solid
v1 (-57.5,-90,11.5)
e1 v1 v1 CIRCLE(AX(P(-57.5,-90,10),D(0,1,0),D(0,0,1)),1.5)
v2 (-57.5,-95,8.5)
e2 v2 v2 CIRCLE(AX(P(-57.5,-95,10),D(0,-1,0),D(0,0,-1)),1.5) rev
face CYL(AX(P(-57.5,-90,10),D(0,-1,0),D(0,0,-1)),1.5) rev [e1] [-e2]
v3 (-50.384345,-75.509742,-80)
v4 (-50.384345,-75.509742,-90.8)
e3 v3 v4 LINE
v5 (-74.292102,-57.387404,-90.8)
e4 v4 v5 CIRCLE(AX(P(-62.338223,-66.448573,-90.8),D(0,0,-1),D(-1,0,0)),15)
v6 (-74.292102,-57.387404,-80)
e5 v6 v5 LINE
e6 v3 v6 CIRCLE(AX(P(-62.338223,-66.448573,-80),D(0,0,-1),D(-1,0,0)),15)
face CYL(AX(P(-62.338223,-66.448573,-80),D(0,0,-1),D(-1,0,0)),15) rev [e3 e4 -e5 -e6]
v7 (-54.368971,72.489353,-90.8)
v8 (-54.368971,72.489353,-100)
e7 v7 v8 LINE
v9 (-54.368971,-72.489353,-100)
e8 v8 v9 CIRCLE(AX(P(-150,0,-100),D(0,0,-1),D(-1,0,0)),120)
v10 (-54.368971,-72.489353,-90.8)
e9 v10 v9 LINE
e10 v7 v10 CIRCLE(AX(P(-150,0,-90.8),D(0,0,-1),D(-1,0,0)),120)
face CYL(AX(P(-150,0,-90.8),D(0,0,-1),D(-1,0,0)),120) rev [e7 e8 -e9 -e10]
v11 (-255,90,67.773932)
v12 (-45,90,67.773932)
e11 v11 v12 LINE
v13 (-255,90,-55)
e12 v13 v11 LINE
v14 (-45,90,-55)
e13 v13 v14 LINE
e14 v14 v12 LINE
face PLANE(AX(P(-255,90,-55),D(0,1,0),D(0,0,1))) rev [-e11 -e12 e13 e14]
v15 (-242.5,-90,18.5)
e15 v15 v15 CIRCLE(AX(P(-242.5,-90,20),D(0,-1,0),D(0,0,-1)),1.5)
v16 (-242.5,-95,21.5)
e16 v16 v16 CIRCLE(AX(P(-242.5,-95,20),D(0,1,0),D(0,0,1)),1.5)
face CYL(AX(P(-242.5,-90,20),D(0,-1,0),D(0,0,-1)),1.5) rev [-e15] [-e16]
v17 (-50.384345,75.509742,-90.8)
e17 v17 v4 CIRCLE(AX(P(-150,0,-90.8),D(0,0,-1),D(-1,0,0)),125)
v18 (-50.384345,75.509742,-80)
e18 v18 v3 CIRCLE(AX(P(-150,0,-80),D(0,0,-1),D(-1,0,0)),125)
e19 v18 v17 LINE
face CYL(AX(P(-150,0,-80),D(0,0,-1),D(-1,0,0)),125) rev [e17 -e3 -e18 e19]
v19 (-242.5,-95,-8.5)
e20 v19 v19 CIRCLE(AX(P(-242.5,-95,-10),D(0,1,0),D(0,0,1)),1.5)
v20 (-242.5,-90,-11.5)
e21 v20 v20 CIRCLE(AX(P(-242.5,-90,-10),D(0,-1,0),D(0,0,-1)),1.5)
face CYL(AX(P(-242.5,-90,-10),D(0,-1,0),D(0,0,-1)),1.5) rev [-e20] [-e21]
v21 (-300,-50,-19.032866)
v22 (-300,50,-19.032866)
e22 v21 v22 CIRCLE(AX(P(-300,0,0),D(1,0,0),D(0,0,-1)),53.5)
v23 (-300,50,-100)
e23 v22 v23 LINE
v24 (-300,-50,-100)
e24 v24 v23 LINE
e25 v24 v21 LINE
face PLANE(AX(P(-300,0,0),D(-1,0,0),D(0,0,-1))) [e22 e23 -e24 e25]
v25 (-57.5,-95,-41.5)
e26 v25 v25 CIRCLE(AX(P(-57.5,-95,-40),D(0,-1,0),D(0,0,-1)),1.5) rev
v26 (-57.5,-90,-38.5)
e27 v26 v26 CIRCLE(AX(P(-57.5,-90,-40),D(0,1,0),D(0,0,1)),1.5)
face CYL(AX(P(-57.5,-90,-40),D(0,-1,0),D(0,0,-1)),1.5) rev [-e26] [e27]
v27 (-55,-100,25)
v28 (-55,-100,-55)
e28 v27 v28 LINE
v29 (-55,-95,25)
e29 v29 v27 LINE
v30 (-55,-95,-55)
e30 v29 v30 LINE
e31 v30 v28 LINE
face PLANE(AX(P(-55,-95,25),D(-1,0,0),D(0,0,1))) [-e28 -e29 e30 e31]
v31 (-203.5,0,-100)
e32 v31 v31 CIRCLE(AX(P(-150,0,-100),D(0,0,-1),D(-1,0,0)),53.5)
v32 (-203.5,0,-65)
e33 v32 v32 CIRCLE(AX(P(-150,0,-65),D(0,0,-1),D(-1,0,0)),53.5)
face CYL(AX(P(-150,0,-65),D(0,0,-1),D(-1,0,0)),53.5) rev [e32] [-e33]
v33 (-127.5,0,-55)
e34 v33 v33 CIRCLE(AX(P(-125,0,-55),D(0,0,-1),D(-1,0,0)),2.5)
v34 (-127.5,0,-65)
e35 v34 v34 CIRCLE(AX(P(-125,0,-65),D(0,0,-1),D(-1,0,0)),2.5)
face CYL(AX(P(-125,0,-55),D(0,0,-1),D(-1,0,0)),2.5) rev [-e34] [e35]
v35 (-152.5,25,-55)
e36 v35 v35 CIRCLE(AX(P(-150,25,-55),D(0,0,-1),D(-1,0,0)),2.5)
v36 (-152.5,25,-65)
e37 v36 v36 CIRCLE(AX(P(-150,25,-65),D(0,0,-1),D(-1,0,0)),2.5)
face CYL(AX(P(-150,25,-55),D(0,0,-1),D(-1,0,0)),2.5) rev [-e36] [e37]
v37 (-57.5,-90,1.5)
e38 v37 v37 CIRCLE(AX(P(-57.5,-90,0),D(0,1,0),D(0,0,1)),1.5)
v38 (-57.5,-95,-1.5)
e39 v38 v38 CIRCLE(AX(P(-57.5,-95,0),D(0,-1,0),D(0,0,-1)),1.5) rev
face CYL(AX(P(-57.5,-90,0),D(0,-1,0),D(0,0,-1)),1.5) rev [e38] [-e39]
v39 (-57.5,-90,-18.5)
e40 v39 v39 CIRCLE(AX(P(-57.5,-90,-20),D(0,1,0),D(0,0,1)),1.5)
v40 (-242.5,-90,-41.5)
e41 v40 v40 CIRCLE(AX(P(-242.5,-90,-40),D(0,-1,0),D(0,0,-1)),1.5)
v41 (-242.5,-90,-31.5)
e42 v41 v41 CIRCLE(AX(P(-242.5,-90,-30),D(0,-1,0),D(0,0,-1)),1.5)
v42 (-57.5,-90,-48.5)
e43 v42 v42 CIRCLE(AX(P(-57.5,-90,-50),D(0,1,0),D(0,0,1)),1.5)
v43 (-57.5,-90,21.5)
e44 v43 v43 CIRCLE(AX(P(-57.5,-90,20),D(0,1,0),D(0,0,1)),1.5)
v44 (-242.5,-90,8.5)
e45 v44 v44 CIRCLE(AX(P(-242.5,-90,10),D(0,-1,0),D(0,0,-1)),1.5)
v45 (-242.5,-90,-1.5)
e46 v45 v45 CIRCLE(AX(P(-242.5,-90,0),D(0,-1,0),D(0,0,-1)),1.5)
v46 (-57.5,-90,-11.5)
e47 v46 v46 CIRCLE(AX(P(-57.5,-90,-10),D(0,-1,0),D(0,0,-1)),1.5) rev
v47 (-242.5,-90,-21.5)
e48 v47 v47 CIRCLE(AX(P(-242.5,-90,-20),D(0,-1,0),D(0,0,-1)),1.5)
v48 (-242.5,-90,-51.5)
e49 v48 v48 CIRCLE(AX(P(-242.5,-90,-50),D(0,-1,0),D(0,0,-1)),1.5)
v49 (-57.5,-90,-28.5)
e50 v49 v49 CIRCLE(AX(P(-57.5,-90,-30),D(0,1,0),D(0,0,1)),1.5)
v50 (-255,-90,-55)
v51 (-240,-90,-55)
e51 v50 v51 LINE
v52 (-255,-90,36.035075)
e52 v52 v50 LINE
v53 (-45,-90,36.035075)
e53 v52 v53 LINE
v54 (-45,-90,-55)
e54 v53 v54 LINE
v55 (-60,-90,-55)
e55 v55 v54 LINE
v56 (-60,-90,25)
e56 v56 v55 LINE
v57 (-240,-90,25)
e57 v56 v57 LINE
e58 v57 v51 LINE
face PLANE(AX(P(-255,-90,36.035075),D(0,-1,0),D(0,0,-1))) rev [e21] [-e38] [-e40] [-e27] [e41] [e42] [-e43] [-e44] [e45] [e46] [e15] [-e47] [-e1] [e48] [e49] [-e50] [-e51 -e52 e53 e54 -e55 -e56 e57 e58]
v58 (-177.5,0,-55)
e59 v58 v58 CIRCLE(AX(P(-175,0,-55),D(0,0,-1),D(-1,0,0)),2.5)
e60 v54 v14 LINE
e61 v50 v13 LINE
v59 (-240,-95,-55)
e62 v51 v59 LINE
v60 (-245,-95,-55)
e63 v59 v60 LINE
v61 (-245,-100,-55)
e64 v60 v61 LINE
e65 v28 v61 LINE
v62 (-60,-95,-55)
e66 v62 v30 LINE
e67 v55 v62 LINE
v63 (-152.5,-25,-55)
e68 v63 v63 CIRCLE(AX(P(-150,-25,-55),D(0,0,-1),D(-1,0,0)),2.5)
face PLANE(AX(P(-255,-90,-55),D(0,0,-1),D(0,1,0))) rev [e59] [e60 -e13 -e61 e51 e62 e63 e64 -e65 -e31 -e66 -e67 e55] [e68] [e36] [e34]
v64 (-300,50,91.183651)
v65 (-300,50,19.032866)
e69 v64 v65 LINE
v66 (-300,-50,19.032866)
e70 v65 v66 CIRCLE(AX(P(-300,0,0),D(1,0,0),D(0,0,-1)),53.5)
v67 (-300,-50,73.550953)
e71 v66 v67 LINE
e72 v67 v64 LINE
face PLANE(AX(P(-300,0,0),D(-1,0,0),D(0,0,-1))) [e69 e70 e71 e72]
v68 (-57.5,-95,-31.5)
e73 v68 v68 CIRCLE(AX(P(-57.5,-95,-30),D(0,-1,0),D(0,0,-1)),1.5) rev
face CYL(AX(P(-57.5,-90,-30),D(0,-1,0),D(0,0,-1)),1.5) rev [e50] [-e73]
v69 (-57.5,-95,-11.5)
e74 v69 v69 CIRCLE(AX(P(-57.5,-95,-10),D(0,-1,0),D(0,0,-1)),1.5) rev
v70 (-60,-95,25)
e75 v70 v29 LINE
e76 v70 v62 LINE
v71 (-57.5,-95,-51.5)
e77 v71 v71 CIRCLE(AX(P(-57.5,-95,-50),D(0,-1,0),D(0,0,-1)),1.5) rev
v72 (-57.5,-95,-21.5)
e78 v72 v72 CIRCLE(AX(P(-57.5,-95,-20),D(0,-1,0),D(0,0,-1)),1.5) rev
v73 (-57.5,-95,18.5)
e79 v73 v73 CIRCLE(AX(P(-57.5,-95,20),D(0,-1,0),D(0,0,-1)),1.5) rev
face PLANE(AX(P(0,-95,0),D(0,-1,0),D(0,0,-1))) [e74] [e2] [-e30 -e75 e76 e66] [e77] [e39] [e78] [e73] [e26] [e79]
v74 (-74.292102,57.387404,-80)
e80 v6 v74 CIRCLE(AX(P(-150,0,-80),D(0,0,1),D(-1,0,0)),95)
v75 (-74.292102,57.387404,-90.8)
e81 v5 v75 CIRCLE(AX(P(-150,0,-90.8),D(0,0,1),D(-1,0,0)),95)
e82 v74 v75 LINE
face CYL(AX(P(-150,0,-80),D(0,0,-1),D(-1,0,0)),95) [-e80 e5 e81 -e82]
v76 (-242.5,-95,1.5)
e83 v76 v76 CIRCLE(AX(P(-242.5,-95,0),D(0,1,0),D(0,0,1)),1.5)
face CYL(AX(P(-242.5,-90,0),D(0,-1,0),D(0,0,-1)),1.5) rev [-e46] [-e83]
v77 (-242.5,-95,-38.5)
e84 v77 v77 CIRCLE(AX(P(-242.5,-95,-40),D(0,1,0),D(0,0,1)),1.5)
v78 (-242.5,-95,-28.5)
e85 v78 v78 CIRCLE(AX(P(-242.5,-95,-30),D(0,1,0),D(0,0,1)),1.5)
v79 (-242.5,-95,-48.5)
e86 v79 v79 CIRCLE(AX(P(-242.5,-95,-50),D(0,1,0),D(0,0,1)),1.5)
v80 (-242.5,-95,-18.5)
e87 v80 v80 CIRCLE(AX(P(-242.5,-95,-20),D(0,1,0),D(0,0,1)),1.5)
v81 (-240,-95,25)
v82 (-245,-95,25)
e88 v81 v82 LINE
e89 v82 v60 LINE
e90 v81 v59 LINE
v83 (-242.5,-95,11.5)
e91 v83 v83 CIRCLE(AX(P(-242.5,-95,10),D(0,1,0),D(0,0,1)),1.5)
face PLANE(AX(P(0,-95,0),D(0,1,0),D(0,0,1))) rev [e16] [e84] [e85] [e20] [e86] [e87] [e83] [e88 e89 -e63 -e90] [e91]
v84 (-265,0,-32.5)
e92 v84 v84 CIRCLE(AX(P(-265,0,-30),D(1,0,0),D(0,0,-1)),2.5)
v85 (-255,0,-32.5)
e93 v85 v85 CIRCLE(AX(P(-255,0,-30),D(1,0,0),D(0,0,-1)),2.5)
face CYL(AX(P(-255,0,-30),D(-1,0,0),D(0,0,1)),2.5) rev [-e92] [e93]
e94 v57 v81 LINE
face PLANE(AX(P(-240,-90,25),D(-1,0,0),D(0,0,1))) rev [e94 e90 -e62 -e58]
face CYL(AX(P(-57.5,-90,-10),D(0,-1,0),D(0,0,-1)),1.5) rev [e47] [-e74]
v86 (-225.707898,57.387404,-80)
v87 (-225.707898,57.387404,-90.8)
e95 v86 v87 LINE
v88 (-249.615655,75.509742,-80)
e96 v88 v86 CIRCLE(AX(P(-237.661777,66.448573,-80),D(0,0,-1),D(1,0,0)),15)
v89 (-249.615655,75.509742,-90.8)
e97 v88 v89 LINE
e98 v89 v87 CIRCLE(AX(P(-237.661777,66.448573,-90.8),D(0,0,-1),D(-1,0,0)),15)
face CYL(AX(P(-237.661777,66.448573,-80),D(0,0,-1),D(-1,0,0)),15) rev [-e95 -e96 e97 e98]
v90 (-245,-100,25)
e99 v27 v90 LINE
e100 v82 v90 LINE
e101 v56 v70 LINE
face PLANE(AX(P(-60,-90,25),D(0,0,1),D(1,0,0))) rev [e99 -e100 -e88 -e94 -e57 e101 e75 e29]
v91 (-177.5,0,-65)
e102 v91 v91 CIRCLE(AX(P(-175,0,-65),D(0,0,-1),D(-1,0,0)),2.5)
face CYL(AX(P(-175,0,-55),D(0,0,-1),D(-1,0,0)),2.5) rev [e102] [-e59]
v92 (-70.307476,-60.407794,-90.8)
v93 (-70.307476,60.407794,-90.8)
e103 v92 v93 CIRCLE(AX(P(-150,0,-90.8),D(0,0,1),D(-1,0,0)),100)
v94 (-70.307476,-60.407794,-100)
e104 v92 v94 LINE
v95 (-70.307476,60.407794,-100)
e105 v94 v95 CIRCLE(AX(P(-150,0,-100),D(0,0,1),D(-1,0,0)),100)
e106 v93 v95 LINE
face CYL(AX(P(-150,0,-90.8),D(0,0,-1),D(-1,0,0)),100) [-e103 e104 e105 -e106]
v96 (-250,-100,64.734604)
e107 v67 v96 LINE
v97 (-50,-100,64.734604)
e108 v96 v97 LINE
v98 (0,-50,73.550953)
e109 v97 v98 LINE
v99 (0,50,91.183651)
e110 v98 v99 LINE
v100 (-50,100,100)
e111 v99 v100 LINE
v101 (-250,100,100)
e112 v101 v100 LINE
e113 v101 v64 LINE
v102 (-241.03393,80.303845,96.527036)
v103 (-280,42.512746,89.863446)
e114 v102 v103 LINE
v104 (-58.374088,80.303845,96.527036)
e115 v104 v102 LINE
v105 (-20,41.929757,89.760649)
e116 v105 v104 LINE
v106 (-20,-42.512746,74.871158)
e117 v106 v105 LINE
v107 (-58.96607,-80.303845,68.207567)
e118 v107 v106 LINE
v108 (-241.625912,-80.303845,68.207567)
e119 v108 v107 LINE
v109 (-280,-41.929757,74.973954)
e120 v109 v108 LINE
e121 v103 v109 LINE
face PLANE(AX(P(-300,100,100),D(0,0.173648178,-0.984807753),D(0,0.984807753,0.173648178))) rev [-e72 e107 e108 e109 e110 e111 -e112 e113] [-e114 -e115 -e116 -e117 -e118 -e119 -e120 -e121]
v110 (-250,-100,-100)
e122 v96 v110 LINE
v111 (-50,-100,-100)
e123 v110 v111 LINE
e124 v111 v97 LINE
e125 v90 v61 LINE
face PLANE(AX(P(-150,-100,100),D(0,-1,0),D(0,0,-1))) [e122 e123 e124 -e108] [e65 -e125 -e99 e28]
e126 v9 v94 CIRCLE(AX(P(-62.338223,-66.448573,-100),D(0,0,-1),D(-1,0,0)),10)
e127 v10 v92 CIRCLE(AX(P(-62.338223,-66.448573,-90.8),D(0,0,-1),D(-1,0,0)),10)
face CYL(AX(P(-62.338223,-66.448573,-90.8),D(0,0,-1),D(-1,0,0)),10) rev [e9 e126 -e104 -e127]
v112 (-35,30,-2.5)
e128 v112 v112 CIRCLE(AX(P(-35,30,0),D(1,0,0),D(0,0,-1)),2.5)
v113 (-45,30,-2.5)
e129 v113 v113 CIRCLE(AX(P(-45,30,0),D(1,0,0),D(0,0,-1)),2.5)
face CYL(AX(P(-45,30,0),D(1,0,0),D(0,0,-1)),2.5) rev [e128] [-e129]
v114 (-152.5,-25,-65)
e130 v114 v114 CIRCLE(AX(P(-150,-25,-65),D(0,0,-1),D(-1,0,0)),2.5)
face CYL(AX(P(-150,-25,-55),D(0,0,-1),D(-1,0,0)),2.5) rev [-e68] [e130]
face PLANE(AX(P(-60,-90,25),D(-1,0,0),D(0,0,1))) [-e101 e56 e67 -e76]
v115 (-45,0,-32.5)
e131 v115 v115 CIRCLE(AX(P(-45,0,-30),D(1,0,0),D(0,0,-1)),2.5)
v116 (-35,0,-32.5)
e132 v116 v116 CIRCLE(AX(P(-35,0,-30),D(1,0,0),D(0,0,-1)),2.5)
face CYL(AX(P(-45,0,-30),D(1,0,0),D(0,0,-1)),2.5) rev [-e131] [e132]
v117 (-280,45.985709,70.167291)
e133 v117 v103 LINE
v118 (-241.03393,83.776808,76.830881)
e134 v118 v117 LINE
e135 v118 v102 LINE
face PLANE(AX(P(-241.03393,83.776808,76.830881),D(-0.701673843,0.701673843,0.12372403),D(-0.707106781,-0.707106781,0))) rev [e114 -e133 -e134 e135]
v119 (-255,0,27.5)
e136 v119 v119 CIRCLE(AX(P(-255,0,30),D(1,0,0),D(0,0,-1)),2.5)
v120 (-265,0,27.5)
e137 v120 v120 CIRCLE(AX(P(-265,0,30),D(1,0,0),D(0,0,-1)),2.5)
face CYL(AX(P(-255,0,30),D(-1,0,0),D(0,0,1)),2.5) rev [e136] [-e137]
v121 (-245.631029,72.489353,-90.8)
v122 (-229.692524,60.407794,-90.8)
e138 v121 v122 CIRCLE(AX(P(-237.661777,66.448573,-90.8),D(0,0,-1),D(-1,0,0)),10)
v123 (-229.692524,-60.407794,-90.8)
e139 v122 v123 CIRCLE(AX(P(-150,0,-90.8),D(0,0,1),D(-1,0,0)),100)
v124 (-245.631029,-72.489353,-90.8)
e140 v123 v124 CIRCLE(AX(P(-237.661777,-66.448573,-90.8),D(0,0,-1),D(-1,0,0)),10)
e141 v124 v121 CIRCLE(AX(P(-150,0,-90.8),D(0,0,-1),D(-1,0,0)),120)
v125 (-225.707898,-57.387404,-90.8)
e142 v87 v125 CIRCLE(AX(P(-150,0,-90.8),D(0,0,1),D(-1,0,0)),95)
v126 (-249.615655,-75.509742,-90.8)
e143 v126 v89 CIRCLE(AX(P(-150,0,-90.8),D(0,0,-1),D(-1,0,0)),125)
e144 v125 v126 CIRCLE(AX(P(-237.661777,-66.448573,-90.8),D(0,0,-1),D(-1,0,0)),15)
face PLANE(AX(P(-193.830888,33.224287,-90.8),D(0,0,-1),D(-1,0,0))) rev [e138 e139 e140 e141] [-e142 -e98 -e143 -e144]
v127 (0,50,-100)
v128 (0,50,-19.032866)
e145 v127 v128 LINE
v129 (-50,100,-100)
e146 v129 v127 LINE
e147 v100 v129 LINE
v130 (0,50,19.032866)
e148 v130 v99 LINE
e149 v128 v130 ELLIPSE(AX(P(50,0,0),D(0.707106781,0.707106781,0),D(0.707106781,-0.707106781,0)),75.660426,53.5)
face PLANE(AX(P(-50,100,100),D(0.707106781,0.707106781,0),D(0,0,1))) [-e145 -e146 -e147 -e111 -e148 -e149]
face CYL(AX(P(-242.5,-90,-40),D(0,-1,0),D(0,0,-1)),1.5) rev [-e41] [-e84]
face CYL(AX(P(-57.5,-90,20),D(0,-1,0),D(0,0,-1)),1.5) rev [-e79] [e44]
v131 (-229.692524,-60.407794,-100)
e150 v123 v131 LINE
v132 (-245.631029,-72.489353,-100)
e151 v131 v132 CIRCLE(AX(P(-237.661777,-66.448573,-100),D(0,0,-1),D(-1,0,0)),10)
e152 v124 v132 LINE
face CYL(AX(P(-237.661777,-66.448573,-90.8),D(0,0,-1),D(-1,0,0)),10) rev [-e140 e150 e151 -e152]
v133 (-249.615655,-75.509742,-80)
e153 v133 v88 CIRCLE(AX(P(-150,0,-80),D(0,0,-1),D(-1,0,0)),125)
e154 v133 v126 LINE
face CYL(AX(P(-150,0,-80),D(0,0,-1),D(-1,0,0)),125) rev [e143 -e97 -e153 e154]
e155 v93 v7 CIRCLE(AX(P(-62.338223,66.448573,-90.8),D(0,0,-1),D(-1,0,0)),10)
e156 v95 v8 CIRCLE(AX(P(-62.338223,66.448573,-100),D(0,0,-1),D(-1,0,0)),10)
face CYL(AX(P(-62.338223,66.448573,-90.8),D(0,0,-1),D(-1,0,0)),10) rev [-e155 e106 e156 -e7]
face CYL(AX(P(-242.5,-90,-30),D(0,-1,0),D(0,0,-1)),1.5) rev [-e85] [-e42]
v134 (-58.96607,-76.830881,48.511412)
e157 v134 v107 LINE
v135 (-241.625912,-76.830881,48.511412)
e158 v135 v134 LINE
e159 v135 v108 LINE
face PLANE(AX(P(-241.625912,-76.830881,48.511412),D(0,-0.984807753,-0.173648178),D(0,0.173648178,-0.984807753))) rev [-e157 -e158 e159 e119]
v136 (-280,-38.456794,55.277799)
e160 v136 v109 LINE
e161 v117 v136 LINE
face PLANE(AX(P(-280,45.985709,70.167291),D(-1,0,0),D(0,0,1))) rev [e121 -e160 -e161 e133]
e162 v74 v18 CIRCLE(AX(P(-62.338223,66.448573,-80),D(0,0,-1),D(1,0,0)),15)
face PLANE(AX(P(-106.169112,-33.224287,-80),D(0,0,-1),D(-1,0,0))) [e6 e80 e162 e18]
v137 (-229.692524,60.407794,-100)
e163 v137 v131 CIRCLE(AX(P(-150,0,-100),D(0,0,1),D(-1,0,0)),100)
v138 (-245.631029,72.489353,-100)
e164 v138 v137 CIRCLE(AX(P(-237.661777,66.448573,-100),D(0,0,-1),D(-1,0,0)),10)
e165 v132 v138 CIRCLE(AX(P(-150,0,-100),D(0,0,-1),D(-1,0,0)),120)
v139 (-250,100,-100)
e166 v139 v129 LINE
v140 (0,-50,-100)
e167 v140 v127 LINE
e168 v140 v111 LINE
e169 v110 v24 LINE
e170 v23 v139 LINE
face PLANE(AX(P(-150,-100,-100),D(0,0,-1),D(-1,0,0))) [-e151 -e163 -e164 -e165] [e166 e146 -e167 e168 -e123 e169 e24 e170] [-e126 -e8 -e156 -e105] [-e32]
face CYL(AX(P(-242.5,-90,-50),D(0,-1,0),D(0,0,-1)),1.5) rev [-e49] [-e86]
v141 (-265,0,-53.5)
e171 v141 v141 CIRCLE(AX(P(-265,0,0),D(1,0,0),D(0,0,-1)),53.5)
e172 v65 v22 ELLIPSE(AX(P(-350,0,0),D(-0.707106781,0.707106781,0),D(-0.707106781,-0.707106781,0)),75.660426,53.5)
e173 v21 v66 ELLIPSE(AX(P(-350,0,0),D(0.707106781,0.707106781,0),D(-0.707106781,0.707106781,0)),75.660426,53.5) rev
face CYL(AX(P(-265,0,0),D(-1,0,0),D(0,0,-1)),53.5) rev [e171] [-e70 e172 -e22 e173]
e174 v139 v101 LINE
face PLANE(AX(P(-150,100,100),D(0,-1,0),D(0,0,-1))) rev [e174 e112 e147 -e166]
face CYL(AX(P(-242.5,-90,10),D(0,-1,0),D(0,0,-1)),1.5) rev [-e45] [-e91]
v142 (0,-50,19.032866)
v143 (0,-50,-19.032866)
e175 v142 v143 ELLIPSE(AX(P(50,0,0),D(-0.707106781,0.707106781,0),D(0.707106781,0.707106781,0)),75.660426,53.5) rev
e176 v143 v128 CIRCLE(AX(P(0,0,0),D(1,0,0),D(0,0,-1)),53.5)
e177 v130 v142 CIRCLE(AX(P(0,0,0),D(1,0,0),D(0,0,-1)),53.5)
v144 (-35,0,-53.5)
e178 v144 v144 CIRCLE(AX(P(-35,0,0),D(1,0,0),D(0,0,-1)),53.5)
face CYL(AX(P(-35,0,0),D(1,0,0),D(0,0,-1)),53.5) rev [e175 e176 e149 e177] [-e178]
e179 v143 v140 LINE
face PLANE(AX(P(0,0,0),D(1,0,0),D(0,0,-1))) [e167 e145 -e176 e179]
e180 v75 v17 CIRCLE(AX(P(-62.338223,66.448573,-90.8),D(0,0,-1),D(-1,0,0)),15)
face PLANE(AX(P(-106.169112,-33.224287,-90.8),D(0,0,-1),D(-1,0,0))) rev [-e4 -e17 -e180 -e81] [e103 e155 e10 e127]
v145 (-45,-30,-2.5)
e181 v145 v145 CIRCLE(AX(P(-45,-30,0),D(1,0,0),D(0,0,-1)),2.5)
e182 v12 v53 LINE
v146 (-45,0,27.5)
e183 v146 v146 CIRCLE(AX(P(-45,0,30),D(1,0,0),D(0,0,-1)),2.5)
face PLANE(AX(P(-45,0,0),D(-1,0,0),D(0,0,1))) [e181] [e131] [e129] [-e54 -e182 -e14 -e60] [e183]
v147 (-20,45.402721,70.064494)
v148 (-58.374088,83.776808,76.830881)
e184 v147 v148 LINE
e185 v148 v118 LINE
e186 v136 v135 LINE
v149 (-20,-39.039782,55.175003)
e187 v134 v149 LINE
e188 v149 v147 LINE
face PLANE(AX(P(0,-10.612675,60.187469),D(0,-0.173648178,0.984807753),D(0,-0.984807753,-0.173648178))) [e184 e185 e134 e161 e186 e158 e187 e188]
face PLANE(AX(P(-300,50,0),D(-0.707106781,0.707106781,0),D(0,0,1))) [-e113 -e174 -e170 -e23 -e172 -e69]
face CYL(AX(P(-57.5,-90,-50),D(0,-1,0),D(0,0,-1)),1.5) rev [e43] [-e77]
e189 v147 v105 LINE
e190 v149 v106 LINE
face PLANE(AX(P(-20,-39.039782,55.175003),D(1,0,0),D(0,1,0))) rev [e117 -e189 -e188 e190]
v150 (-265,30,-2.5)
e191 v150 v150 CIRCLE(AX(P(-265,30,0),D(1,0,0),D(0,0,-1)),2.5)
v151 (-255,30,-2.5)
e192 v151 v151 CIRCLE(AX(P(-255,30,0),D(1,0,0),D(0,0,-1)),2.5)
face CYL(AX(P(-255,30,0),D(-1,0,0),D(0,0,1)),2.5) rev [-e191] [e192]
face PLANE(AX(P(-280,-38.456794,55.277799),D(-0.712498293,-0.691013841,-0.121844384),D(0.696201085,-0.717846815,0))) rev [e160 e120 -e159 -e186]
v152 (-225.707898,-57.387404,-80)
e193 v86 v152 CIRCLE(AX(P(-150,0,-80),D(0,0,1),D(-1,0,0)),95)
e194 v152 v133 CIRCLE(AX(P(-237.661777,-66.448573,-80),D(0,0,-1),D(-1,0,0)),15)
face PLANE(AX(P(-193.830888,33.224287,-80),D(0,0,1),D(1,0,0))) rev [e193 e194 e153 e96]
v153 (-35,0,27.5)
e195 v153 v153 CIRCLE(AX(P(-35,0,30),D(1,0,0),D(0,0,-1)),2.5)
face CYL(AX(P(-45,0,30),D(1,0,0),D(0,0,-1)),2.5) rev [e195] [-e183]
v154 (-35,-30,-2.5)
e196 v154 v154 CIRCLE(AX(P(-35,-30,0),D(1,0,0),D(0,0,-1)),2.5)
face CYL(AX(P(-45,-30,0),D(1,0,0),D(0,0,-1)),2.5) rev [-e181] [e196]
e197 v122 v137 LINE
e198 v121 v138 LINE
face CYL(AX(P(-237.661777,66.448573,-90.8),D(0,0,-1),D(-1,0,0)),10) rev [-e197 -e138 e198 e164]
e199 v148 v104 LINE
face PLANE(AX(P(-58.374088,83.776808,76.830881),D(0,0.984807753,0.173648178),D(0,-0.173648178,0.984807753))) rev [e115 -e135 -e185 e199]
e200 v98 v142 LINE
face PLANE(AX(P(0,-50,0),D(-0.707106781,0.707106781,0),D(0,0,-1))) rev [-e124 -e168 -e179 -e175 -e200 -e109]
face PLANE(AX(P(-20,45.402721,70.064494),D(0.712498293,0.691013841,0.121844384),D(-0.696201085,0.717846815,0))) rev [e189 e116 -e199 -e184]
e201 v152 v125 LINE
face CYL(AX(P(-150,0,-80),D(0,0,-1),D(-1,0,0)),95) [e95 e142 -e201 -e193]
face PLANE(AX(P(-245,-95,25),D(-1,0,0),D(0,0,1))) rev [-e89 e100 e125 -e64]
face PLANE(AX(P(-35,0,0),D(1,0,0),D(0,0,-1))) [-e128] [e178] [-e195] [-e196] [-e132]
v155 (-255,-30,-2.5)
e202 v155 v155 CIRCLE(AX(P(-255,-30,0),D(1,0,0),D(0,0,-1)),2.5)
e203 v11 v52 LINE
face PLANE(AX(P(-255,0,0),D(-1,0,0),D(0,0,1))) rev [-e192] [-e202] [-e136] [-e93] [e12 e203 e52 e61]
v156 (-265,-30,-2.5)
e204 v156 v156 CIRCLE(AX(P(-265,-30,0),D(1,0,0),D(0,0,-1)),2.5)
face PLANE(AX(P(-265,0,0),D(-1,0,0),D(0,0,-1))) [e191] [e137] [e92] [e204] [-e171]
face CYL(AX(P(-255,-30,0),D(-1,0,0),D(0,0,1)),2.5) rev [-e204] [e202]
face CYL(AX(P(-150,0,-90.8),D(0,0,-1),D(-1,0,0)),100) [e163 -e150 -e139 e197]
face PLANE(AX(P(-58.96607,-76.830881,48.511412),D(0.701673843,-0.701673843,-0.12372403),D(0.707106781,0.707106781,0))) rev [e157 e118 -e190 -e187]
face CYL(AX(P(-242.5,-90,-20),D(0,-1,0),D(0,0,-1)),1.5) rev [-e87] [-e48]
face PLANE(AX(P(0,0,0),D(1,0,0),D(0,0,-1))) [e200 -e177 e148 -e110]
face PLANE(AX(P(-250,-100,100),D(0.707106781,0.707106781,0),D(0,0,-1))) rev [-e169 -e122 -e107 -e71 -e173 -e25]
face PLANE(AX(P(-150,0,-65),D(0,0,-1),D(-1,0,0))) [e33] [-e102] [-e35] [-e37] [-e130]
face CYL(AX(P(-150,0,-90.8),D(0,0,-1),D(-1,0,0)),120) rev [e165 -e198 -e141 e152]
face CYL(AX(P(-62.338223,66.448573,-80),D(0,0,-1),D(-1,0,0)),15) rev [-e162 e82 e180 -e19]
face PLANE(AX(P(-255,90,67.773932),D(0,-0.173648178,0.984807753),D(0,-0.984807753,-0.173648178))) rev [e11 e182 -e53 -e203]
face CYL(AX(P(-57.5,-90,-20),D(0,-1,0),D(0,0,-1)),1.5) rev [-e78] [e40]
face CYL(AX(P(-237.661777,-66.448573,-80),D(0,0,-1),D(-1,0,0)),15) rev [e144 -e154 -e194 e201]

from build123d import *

# Parameters (mm, degrees)
SKETCH1_W           = 200
SKETCH1_H           = 200
BOSS_EXTRUDE1_DEPTH = 150
SKETCH2_R           = 53.5
CUT_EXTRUDE1_DEPTH  = 35
CUT_EXTRUDE3_DEPTH  = 332.662479036
CHAMFER2_SIZE       = 50
CUT_EXTRUDE5_DEPTH  = 20
CUT_EXTRUDE6_DEPTH  = 20
BOSS_EXTRUDE3_DEPTH = 9.2
SKETCH11_R          = 53.5
CUT_EXTRUDE7_DEPTH  = 35
SKETCH12_R          = 2.5
CUT_EXTRUDE8_DEPTH  = 10
SKETCH13_R          = 2.5
CUT_EXTRUDE9_DEPTH  = 10
CUT_EXTRUDE10_DEPTH = 105
SKETCH15_W          = 180
SKETCH15_H          = 80
CUT_EXTRUDE11_DEPTH = 10
SKETCH17_W          = 5
SKETCH17_H          = 80
CUT_EXTRUDE12_DEPTH = 5
SKETCH17_3_R        = 1.5
CUT_EXTRUDE13_DEPTH = 10


with BuildPart() as part:
    # Sketch1 → Boss-Extrude1 (new body)
    with BuildSketch(Plane(origin=(0, 0, 0), x_dir=(0, 0, -1), z_dir=(1, 0, 0))):
        Rectangle(SKETCH1_W, SKETCH1_H)
    extrude(amount=-BOSS_EXTRUDE1_DEPTH)

    # Sketch2 → Cut-Extrude1 (cut)
    with BuildSketch(Plane(origin=(0, 0, 0), x_dir=(0, 0, -1), z_dir=(1, 0, 0))):
        Circle(SKETCH2_R)
    extrude(amount=-CUT_EXTRUDE1_DEPTH, mode=Mode.SUBTRACT)

    # Mirror1: part across plane


with BuildPart() as part_1:
    add(part.part)
    add(part.part.mirror(Plane(origin=(-150, 0, 0), x_dir=(0, 0, 1), z_dir=(1, 0, 0))))

    # Sketch6 → Cut-Extrude3 (cut, through all)
    with BuildSketch(Plane(origin=(0, 0, 0), x_dir=(0, 0, -1), z_dir=(1, 0, 0))):
        Polygon((-100, 100), (-64.734603858, -100), (-100, -100), align=None)
    extrude(amount=-CUT_EXTRUDE3_DEPTH, mode=Mode.SUBTRACT)

    # Chamfer2
    # the kernel refuses this chamfer: 50 mm, written as the material it takes off along each edge
    with BuildSketch(Plane(origin=(-300, 100, -228.584149398), x_dir=(-0.027495876610586594, -0.9996219169112966, 0), z_dir=(0, 0, 1))) as chamfer2_piece_1:
        Polygon((CHAMFER2_SIZE * 0.999621916911, CHAMFER2_SIZE * 0.0274958766106), (-CHAMFER2_SIZE * 0.0274958766106, CHAMFER2_SIZE * 0.999621916911), (0, 0), align=None)
    extrude(amount=457.168298797, mode=Mode.SUBTRACT)
    with BuildSketch(Plane(origin=(-300, -100, 193.318753257), x_dir=(0.9996219169112966, -0.02749587661058631, 0), z_dir=(0, 0, -1))) as chamfer2_piece_2:
        Polygon((CHAMFER2_SIZE * 0.999621916911, -CHAMFER2_SIZE * 0.0274958766106), (-CHAMFER2_SIZE * 0.0274958766106, -CHAMFER2_SIZE * 0.999621916911), (0, 0), align=None)
    extrude(amount=421.902902655, mode=Mode.SUBTRACT)
    with BuildSketch(Plane(origin=(0, -100, 193.318753257), x_dir=(-0.9996219169112966, -0.027495876610586317, 0), z_dir=(0, 0, -1))) as chamfer2_piece_3:
        Polygon((CHAMFER2_SIZE * 0.999621916911, CHAMFER2_SIZE * 0.0274958766106), (-CHAMFER2_SIZE * 0.0274958766106, CHAMFER2_SIZE * 0.999621916911), (0, 0), align=None)
    extrude(amount=421.902902655, mode=Mode.SUBTRACT)
    with BuildSketch(Plane(origin=(0, 100, -228.584149398), x_dir=(0.02749587661058637, -0.9996219169112966, 0), z_dir=(0, 0, 1))) as chamfer2_piece_4:
        Polygon((CHAMFER2_SIZE * 0.999621916911, -CHAMFER2_SIZE * 0.0274958766106), (-CHAMFER2_SIZE * 0.0274958766106, -CHAMFER2_SIZE * 0.999621916911), (0, 0), align=None)
    extrude(amount=457.168298797, mode=Mode.SUBTRACT)

    # Sketch8 → Cut-Extrude5 (cut)
    with BuildSketch(Plane(origin=(0, -14.085638206, 79.883623873), x_dir=(1, 0, 0), z_dir=(0, -0.17364817766693483, 0.9848077530122074))):
        Polygon((-280, -28.273659533), (-241.625912379, -67.239729309), (-58.966069777, -67.239729309), (-20, -28.865641689), (-20, 56.879523291), (-58.374087621, 95.845593068), (-241.033930223, 95.845593068), (-280, 57.471505447), align=None)
    extrude(amount=-CUT_EXTRUDE5_DEPTH, mode=Mode.SUBTRACT)

    # Sketch9 → Cut-Extrude6 (cut)
    with BuildSketch(Plane(origin=(0, 0, -100), x_dir=(-1, 0, 0), z_dir=(0, 0, -1))):
        with BuildLine():
            ThreePointArc((249.615655403, -75.509742408), (275, 0), (249.615655403, 75.509742408))
            ThreePointArc((249.615655403, 75.509742408), (228.600607666, 78.402451968), (225.707898107, 57.38740423))
            ThreePointArc((225.707898107, 57.38740423), (245, 0), (225.707898107, -57.38740423))
            ThreePointArc((225.707898107, -57.38740423), (228.600607666, -78.402451968), (249.615655403, -75.509742408))
        make_face()
        with BuildLine():
            ThreePointArc((50.384344597, 75.509742408), (71.399392334, 78.402451968), (74.292101893, 57.38740423))
            ThreePointArc((74.292101893, 57.38740423), (55, 0), (74.292101893, -57.38740423))
            ThreePointArc((74.292101893, -57.38740423), (71.399392334, -78.402451968), (50.384344597, -75.509742408))
            ThreePointArc((50.384344597, -75.509742408), (25, 0), (50.384344597, 75.509742408))
        make_face()
    extrude(amount=-CUT_EXTRUDE6_DEPTH, mode=Mode.SUBTRACT)

    # Sketch10 → Boss-Extrude3 (add)
    # profile 1 of 2: a face of its own
    with BuildSketch(Plane(origin=(0, 0, -100), x_dir=(-1, 0, 0), z_dir=(0, 0, -1))):
        with BuildLine():
            ThreePointArc((74.292101893, 57.38740423), (55, 0), (74.292101893, -57.38740423))
            ThreePointArc((74.292101893, -57.38740423), (71.399392334, -78.402451968), (50.384344597, -75.509742408))
            ThreePointArc((50.384344597, -75.509742408), (25, 0), (50.384344597, 75.509742408))
            ThreePointArc((50.384344597, 75.509742408), (71.399392334, 78.402451968), (74.292101893, 57.38740423))
        make_face()
        with BuildLine():
            ThreePointArc((70.307475677, 60.407793927), (50, 0), (70.307475677, -60.407793927))
            ThreePointArc((70.307475677, -60.407793927), (68.379002638, -74.417825752), (54.368970813, -72.489352712))
            ThreePointArc((54.368970813, -72.489352712), (30, 0), (54.368970813, 72.489352712))
            ThreePointArc((54.368970813, 72.489352712), (68.379002638, 74.417825752), (70.307475677, 60.407793927))
        make_face(mode=Mode.SUBTRACT)
    # profile 2 of 2: a face of its own
    with BuildSketch(Plane(origin=(0, 0, -100), x_dir=(-1, 0, 0), z_dir=(0, 0, -1))):
        with BuildLine():
            ThreePointArc((249.615655403, 75.509742408), (228.600607666, 78.402451968), (225.707898107, 57.38740423))
            ThreePointArc((225.707898107, 57.38740423), (245, 0), (225.707898107, -57.38740423))
            ThreePointArc((225.707898107, -57.38740423), (228.600607666, -78.402451968), (249.615655403, -75.509742408))
            ThreePointArc((249.615655403, -75.509742408), (275, 0), (249.615655403, 75.509742408))
        make_face()
        with BuildLine():
            ThreePointArc((245.631029187, 72.489352712), (231.620997362, 74.417825752), (229.692524323, 60.407793927))
            ThreePointArc((229.692524323, 60.407793927), (250, 0), (229.692524323, -60.407793927))
            ThreePointArc((229.692524323, -60.407793927), (231.620997362, -74.417825752), (245.631029187, -72.489352712))
            ThreePointArc((245.631029187, -72.489352712), (270, 0), (245.631029187, 72.489352712))
        make_face(mode=Mode.SUBTRACT)
    extrude(amount=-BOSS_EXTRUDE3_DEPTH)

    # Sketch11 → Cut-Extrude7 (cut)
    with BuildSketch(Plane(origin=(0, 0, -100), x_dir=(-1, 0, 0), z_dir=(0, 0, -1))):
        with Locations((150, 0)):
            Circle(SKETCH11_R)
    extrude(amount=-CUT_EXTRUDE7_DEPTH, mode=Mode.SUBTRACT)

    # Sketch12 → Cut-Extrude8 (cut)
    with BuildSketch(Plane(origin=(-35, 0, 0), x_dir=(0, 0, -1), z_dir=(1, 0, 0))):
        with Locations((0, 30)):
            Circle(SKETCH12_R)
        with Locations((30, 0)):
            Circle(SKETCH12_R)
        with Locations((0, -30)):
            Circle(SKETCH12_R)
        with Locations((-30, 0)):
            Circle(SKETCH12_R)
    cut_extrude8 = extrude(amount=-CUT_EXTRUDE8_DEPTH, mode=Mode.SUBTRACT)

    # Mirror2: Cut-Extrude8 across plane
    add(cut_extrude8.mirror(Plane(origin=(-150, 0, 0), x_dir=(0, 0, 1), z_dir=(1, 0, 0))), mode=Mode.SUBTRACT)

    # Sketch13 → Cut-Extrude9 (cut)
    with BuildSketch(Plane(origin=(0, 0, -65), x_dir=(-1, 0, 0), z_dir=(0, 0, -1))):
        with Locations((150, 25)):
            Circle(SKETCH13_R)
        with Locations((150, -25)):
            Circle(SKETCH13_R)
        with Locations((175, 0)):
            Circle(SKETCH13_R)
        with Locations((125, 0)):
            Circle(SKETCH13_R)
    extrude(amount=-CUT_EXTRUDE9_DEPTH, mode=Mode.SUBTRACT)

    # Sketch14 → Cut-Extrude10 (cut, symmetric)
    with BuildSketch(Plane(origin=(-150, 0, 0), x_dir=(0, 0, -1), z_dir=(1, 0, 0))):
        Polygon((-67.773931836, 90), (-36.035075309, -90), (55, -90), (55, 90), align=None)
    extrude(amount=CUT_EXTRUDE10_DEPTH, both=True, mode=Mode.SUBTRACT)

    # Sketch15 → Cut-Extrude11 (cut)
    with BuildSketch(Plane.XZ.offset(100)):
        with Locations((-150, -15)):
            Rectangle(SKETCH15_W, SKETCH15_H)
    extrude(amount=-CUT_EXTRUDE11_DEPTH, mode=Mode.SUBTRACT)

    # Sketch17 → Cut-Extrude12 (cut)
    with BuildSketch(Plane.XZ.offset(100)):
        with Locations((-242.5, -15)):
            Rectangle(SKETCH17_W, SKETCH17_H)
        with Locations((-57.5, -15)):
            Rectangle(SKETCH17_W, SKETCH17_H)
    extrude(amount=-CUT_EXTRUDE12_DEPTH, mode=Mode.SUBTRACT)

    # Sketch17<3> → Cut-Extrude13 (cut)
    with BuildSketch(Plane.XZ.offset(100)):
        with Locations(Location((-57.5, -10, 0), (0, 0, 270))):
            Circle(SKETCH17_3_R)
        with Locations(Location((-242.5, 20, 0), (0, 0, 270))):
            Circle(SKETCH17_3_R)
        with Locations(Location((-242.5, 10, 0), (0, 0, 270))):
            Circle(SKETCH17_3_R)
        with Locations(Location((-242.5, 0, 0), (0, 0, 270))):
            Circle(SKETCH17_3_R)
        with Locations(Location((-242.5, -10, 0), (0, 0, 270))):
            Circle(SKETCH17_3_R)
        with Locations(Location((-242.5, -20, 0), (0, 0, 270))):
            Circle(SKETCH17_3_R)
        with Locations(Location((-242.5, -30, 0), (0, 0, 270))):
            Circle(SKETCH17_3_R)
        with Locations(Location((-242.5, -40, 0), (0, 0, 270))):
            Circle(SKETCH17_3_R)
        with Locations(Location((-242.5, -50, 0), (0, 0, 270))):
            Circle(SKETCH17_3_R)
        with Locations(Location((-57.5, -50, 0), (0, 0, 270))):
            Circle(SKETCH17_3_R)
        with Locations(Location((-57.5, -40, 0), (0, 0, 270))):
            Circle(SKETCH17_3_R)
        with Locations(Location((-57.5, -30, 0), (0, 0, 270))):
            Circle(SKETCH17_3_R)
        with Locations(Location((-57.5, -20, 0), (0, 0, 270))):
            Circle(SKETCH17_3_R)
        with Locations(Location((-57.5, 0, 0), (0, 0, 270))):
            Circle(SKETCH17_3_R)
        with Locations(Location((-57.5, 10, 0), (0, 0, 270))):
            Circle(SKETCH17_3_R)
        with Locations(Location((-57.5, 20, 0), (0, 0, 270))):
            Circle(SKETCH17_3_R)
    extrude(amount=-CUT_EXTRUDE13_DEPTH, mode=Mode.SUBTRACT)


solid = part_1.part
